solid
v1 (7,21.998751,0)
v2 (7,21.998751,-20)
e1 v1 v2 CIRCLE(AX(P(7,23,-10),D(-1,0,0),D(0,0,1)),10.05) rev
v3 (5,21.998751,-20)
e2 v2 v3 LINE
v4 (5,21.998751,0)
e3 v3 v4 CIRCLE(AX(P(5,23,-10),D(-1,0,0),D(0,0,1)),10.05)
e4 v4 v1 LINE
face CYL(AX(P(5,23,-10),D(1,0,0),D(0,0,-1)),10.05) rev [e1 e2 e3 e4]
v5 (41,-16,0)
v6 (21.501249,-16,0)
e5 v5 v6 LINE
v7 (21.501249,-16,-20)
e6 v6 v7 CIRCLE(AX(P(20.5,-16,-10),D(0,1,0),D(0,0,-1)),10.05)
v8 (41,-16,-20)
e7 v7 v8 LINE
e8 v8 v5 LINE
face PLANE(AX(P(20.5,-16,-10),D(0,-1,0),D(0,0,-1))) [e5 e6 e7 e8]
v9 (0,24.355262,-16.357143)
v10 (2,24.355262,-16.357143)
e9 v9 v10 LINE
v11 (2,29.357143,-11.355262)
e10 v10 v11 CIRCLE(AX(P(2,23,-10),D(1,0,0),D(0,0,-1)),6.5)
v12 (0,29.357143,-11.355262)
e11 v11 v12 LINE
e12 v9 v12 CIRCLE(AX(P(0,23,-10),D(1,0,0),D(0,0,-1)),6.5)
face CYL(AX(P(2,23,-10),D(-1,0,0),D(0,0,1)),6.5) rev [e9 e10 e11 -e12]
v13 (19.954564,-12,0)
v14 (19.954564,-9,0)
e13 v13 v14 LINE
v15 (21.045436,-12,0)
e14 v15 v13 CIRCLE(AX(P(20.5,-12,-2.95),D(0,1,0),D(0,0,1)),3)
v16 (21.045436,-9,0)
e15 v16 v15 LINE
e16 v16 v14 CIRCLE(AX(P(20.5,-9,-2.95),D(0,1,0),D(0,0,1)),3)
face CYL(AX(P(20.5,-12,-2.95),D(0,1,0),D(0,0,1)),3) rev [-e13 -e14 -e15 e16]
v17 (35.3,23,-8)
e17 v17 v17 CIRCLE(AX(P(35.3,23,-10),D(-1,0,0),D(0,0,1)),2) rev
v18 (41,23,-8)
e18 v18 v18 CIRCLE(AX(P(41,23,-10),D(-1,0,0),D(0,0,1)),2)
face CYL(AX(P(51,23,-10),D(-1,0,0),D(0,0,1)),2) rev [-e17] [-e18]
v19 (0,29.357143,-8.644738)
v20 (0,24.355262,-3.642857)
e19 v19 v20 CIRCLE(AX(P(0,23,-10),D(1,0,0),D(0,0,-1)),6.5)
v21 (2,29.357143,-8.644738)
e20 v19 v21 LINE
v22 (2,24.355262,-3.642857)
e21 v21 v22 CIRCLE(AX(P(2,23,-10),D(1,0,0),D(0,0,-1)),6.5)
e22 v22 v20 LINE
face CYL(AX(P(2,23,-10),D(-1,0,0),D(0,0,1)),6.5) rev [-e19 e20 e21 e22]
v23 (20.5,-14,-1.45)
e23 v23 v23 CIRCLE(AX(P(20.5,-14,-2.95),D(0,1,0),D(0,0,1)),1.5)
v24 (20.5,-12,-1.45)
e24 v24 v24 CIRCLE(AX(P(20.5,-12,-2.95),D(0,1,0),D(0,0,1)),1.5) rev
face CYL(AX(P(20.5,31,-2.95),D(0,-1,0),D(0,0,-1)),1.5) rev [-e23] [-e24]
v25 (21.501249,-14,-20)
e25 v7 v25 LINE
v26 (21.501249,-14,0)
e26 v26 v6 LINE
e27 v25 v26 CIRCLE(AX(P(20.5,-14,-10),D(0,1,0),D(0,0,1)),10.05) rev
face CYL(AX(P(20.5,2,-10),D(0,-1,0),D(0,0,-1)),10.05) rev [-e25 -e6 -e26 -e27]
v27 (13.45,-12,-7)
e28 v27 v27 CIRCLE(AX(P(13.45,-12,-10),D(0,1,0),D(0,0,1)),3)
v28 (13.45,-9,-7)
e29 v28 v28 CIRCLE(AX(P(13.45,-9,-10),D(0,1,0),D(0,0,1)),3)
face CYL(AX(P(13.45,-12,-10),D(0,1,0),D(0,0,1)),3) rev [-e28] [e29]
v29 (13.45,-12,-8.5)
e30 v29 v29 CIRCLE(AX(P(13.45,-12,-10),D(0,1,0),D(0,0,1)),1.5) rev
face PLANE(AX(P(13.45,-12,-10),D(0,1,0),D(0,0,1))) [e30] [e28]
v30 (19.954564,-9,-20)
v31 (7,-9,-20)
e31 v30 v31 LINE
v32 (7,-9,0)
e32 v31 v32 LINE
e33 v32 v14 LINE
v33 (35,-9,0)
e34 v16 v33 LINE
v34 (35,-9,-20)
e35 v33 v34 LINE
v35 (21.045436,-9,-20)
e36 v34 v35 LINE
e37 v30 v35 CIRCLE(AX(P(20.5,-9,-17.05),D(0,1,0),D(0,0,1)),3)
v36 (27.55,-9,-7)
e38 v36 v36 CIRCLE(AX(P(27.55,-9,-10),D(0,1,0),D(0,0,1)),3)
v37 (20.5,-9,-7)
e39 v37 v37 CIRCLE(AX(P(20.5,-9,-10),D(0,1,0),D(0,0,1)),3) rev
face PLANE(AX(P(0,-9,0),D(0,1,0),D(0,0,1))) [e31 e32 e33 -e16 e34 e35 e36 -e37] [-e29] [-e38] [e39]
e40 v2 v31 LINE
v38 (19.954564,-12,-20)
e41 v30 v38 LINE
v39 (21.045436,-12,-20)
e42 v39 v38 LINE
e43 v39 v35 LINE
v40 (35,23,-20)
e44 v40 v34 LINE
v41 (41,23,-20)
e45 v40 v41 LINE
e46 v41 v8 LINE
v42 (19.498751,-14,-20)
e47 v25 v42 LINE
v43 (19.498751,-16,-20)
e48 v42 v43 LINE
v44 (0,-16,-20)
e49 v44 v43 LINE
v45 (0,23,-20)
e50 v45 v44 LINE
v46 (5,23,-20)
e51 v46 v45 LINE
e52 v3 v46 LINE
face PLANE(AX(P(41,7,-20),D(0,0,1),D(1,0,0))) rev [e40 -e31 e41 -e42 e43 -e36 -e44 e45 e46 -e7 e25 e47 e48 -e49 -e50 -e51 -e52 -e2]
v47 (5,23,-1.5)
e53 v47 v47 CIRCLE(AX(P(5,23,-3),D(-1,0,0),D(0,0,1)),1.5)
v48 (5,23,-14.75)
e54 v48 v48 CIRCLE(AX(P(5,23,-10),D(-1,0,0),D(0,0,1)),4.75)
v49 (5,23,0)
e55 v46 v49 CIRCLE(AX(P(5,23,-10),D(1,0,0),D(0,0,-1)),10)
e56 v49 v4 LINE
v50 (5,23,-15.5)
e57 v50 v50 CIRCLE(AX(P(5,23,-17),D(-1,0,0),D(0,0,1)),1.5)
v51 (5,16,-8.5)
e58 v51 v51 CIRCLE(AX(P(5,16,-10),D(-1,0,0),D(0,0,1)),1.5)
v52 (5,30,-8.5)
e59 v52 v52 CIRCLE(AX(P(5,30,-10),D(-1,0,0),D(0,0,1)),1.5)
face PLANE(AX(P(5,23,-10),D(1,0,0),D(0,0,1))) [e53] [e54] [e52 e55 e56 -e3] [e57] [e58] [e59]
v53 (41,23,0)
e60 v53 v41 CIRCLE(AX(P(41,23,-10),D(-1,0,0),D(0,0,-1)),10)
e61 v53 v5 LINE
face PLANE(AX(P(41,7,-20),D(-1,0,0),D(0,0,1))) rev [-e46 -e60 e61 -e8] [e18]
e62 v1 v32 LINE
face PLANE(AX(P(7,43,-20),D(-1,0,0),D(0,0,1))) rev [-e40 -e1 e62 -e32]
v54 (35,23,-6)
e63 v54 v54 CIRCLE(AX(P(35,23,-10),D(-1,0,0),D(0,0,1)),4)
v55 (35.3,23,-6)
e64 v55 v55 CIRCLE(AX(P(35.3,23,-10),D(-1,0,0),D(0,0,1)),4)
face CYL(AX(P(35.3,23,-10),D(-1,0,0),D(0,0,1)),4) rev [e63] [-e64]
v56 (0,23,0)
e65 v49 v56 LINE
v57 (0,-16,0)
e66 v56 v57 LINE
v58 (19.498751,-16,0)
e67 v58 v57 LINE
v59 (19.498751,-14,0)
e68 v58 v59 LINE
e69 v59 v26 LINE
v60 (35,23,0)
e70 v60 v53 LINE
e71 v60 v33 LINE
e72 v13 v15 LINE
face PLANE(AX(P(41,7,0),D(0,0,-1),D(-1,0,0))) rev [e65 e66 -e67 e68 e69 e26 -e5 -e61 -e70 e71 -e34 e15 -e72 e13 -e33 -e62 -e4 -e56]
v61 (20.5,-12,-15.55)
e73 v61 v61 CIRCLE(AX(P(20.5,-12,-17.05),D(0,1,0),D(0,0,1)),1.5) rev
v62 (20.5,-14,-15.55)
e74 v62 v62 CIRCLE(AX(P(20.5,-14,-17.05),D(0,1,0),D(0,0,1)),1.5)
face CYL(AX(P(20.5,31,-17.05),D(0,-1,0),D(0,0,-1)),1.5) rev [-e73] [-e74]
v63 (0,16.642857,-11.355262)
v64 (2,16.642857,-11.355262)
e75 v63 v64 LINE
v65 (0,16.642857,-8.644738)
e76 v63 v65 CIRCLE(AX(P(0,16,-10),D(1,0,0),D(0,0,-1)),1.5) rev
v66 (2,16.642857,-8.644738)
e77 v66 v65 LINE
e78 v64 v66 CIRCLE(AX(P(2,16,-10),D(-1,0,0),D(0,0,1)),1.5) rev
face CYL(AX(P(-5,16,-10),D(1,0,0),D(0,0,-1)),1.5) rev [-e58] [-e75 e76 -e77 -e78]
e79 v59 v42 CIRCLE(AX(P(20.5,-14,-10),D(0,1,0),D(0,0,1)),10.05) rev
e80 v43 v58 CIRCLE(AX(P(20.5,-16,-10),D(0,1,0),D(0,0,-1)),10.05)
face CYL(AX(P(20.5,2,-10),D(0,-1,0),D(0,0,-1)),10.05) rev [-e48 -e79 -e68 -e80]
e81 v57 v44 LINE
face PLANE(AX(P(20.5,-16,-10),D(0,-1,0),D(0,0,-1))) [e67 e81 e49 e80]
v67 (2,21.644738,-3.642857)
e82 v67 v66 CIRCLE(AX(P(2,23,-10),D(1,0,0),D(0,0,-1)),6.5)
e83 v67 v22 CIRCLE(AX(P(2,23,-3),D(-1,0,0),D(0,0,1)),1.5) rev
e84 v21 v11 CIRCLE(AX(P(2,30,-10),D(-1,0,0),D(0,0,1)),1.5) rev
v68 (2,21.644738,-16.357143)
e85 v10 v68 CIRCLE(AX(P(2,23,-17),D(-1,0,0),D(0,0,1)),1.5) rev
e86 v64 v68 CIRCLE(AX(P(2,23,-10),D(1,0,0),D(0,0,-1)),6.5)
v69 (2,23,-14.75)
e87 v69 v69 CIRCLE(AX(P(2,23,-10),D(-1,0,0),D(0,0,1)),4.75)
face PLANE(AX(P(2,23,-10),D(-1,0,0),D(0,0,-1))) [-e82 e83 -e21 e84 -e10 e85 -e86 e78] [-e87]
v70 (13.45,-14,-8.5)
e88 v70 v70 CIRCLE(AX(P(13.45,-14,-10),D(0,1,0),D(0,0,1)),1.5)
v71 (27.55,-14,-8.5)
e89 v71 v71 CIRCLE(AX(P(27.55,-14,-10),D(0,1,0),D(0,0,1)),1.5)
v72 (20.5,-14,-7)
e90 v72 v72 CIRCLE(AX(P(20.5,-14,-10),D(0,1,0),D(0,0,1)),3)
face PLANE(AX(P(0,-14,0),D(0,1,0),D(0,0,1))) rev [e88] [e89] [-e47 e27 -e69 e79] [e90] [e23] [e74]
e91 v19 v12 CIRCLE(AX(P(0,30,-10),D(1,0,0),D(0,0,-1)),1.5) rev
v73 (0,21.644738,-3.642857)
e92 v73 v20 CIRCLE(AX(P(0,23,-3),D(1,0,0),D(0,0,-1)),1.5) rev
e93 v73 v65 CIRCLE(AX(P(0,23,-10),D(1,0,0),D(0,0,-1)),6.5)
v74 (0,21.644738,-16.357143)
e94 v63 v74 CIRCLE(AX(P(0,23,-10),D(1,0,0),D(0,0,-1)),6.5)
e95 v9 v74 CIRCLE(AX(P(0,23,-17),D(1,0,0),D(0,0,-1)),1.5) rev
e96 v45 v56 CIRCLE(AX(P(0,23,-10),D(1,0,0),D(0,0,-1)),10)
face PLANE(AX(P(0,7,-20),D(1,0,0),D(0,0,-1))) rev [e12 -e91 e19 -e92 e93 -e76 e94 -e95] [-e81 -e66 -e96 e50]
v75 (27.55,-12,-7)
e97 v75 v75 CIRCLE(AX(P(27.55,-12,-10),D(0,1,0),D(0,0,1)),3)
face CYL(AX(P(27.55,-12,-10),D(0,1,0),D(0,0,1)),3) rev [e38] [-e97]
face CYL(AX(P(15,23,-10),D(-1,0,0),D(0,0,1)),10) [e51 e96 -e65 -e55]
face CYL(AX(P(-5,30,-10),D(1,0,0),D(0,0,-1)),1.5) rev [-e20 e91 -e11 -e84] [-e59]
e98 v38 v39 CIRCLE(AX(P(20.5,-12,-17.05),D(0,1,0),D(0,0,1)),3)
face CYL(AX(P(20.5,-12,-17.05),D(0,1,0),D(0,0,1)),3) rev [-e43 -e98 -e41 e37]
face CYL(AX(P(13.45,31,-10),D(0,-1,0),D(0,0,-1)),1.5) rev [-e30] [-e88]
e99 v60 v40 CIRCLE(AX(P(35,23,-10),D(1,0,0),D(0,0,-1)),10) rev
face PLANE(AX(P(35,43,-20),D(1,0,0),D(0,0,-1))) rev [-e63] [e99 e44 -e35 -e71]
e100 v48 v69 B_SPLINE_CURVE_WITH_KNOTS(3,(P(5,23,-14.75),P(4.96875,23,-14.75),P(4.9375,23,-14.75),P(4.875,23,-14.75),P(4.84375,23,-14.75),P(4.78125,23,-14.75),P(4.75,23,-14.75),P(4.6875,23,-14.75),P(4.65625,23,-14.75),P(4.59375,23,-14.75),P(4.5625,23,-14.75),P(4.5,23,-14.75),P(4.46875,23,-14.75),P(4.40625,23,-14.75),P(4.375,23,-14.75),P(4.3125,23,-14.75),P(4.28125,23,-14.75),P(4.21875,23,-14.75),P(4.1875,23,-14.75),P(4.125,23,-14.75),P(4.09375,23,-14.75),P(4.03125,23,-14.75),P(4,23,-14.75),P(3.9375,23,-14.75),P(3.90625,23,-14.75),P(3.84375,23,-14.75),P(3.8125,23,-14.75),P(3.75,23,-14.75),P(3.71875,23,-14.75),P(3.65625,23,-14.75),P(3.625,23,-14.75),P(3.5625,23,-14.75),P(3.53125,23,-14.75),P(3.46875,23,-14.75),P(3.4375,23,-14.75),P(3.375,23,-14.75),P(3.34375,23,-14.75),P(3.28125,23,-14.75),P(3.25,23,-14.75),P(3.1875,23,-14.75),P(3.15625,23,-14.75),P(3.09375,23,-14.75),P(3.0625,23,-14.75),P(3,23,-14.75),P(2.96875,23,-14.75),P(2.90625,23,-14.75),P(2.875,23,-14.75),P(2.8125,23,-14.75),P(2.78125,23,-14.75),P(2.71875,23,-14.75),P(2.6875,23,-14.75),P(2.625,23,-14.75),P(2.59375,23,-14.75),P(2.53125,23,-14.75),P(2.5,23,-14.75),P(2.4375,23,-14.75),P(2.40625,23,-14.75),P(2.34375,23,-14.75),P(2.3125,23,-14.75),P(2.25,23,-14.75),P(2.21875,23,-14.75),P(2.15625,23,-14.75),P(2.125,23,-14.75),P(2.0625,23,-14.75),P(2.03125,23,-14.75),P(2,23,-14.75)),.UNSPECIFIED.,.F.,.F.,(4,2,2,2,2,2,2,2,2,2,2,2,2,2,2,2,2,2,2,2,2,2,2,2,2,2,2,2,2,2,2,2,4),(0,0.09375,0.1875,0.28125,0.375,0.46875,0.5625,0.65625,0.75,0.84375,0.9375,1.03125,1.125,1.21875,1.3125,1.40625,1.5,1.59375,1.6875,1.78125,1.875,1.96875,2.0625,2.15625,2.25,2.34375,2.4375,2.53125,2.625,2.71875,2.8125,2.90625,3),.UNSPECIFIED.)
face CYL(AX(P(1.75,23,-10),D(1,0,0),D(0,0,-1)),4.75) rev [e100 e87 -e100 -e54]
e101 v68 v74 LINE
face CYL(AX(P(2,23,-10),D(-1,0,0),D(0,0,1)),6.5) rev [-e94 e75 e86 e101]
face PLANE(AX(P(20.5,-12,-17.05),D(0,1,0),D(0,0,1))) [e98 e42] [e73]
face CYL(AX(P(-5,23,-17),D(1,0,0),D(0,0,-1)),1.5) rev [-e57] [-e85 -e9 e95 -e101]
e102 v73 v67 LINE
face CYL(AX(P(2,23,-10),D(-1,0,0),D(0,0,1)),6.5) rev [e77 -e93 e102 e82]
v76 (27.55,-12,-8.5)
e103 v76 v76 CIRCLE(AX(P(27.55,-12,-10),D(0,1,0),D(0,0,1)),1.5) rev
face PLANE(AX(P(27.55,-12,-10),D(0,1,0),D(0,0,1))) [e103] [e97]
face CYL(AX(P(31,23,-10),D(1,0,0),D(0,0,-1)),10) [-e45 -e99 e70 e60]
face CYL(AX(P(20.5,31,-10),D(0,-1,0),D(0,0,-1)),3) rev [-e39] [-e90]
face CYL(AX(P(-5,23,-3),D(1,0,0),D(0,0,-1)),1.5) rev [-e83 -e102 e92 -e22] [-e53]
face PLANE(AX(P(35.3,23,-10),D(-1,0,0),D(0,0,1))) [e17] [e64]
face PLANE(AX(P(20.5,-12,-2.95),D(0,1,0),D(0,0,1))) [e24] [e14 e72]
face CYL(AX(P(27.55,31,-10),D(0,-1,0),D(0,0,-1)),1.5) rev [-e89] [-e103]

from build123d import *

# Parameters (mm, degrees)
SKETCH1_W                = 41
SKETCH1_H                = 20
BOSS_EXTRUDE2_DEPTH      = 7
SKETCH3_R                = 10.05
CUT_EXTRUDE8_DEPTH       = 2
SKETCH4_R                = 1.5
SKETCH4_R_2              = 3
CUT_EXTRUDE9_DEPTH       = 29
SKETCH5_W                = 6
SKETCH5_H                = 20
SKETCH5_W_2              = 7
BOSS_EXTRUDE3_DEPTH      = 36
CUT_EXTRUDE10_DEPTH      = 36
SKETCH7_R                = 2
CUT_EXTRUDE11_DEPTH      = 51
SKETCH8_R                = 10.05
CUT_EXTRUDE12_DEPTH      = 2
SKETCH9_R                = 4.75
CUT_EXTRUDE13_DEPTH      = 3.25
SKETCH10_R               = 6.5
CUT_EXTRUDE14_DEPTH      = 2
CUT_EXTRUDE15_DEPTH      = 14
CUT_EXTRUDE15_DEPTH_BACK = 10
SKETCH12_R               = 1.5
CUT_EXTRUDE16_DEPTH      = 10
CUT_EXTRUDE17_DEPTH      = 10
MIRROR1_START            = 5
MIRROR1_DEPTH            = 2
MIRROR1_2_DEPTH          = 7
MIRROR1_3_DEPTH          = 5
CUT_EXTRUDE18_DEPTH      = 10
CUT_EXTRUDE18_DEPTH_BACK = 10
BOSS_EXTRUDE4_START      = 16
BOSS_EXTRUDE4_DEPTH      = 16
BOSS_EXTRUDE6_START      = -21
SKETCH16_W               = 28
SKETCH16_H               = 20
SKETCH16_R               = 1.5
SKETCH16_R_2             = 3
BOSS_EXTRUDE6_DEPTH      = 21
SKETCH18_W               = 28
SKETCH18_H               = 20
CUT_EXTRUDE21_DEPTH      = 16
CROQUIS2_R               = 3
CORTAR_EXTRUIR1_DEPTH    = 3
CROQUIS3_R               = 4
CORTAR_EXTRUIR2_DEPTH    = 0.3


# Read off the part's stored shape, not the designer's step: Mirror1
with BuildPart() as part:
    # Sketch1 → Boss-Extrude2 (new body)
    with BuildSketch(Plane(origin=(0, 0, 0), x_dir=(1, 0, 0), z_dir=(0, 1, 0))):
        with Locations((20.5, 10)):
            Rectangle(SKETCH1_W, SKETCH1_H)
    extrude(amount=BOSS_EXTRUDE2_DEPTH)

    # Sketch3 → Cut-Extrude8 (cut)
    with BuildSketch(Plane.XZ):
        with Locations((20.5, -10)):
            Circle(SKETCH3_R)
    extrude(amount=-CUT_EXTRUDE8_DEPTH, mode=Mode.SUBTRACT)

    # Sketch4 → Cut-Extrude9 (cut)
    with BuildSketch(Plane.XZ.offset(-2)):
        with Locations(Location((20.5, -2.95, 0), (0, 0, 270))):
            Circle(SKETCH4_R)
        with Locations(Location((27.55, -10, 0), (0, 0, 270))):
            Circle(SKETCH4_R)
        with Locations(Location((20.5, -17.05, 0), (0, 0, 270))):
            Circle(SKETCH4_R)
        with Locations(Location((13.45, -10, 0), (0, 0, 270))):
            Circle(SKETCH4_R)
        with Locations(Location((20.5, -10, 0), (0, 0, 270))):
            Circle(SKETCH4_R_2)
    extrude(amount=-CUT_EXTRUDE9_DEPTH, mode=Mode.SUBTRACT)

    # Sketch5 → Boss-Extrude3 (add)
    with BuildSketch(Plane(origin=(0, 7, 0), x_dir=(1, 0, 0), z_dir=(0, 1, 0))):
        with Locations((38, 10)):
            Rectangle(SKETCH5_W, SKETCH5_H)
        with Locations((3.5, 10)):
            Rectangle(SKETCH5_W_2, SKETCH5_H)
    extrude(amount=BOSS_EXTRUDE3_DEPTH)

    # Sketch6 → Cut-Extrude10 (cut)
    with BuildSketch(Plane.XY):
        Polygon((0, 33), (71.43253461, 33), (71.43253461, 55.308458538), (-13.966778087, 55.308458538), align=None)
    extrude(amount=-CUT_EXTRUDE10_DEPTH, mode=Mode.SUBTRACT)

    # Sketch7 → Cut-Extrude11 (cut)
    with BuildSketch(Plane.ZY):
        with Locations((-10, 23)):
            Circle(SKETCH7_R)
    extrude(amount=-CUT_EXTRUDE11_DEPTH, mode=Mode.SUBTRACT)

    # Sketch8 → Cut-Extrude12 (cut)
    with BuildSketch(Plane.ZY):
        with Locations((-10, 23)):
            Circle(SKETCH8_R)
    extrude(amount=-CUT_EXTRUDE12_DEPTH, mode=Mode.SUBTRACT)

    # Sketch9 → Cut-Extrude13 (cut)
    with BuildSketch(Plane.ZY.offset(-2)):
        with Locations((-10, 23)):
            Circle(SKETCH9_R)
    extrude(amount=-CUT_EXTRUDE13_DEPTH, mode=Mode.SUBTRACT)

    # Sketch10 → Cut-Extrude14 (cut)
    with BuildSketch(Plane(origin=(7, 0, 0), x_dir=(0, 0, -1), z_dir=(1, 0, 0))):
        with Locations((10, 23)):
            Circle(SKETCH10_R)
    extrude(amount=-CUT_EXTRUDE14_DEPTH, mode=Mode.SUBTRACT)

    # Sketch11 → Cut-Extrude15 (cut, two sides: drawn at the far end of the back side and taken through both)
    with BuildSketch(Plane.ZY.offset(-2).offset(-CUT_EXTRUDE15_DEPTH_BACK)):
        with BuildLine():
            Line((0, 23), (15.490351621, 23))
            Line((15.490351621, 23), (12.295560885, 45.157965149))
            Line((12.295560885, 45.157965149), (-24.464924867, 45.157965149))
            Line((-24.464924867, 45.157965149), (-29.902866546, 24.493786768))
            Line((-29.902866546, 24.493786768), (-20, 23))
            ThreePointArc((-20, 23), (-10, 33), (0, 23))
        make_face()
    extrude(amount=CUT_EXTRUDE15_DEPTH + CUT_EXTRUDE15_DEPTH_BACK, mode=Mode.SUBTRACT)

    # Sketch12 → Cut-Extrude16 (cut)
    with BuildSketch(Plane.ZY.offset(-2)):
        with Locations((-10, 30)):
            Circle(SKETCH12_R)
        with Locations((-3, 23)):
            Circle(SKETCH12_R)
        with Locations((-10, 16)):
            Circle(SKETCH12_R)
        with Locations((-17, 23)):
            Circle(SKETCH12_R)
    extrude(amount=-CUT_EXTRUDE16_DEPTH, mode=Mode.SUBTRACT)

    # Sketch13 → Cut-Extrude17 (cut)
    with BuildSketch(Plane(origin=(41, 0, 0), x_dir=(0, 0, -1), z_dir=(1, 0, 0))):
        with BuildLine():
            Line((20, 23), (26.17535893, 23))
            Line((26.17535893, 23), (24.098367316, 34.532076054))
            Line((24.098367316, 34.532076054), (-4.476002155, 34.532076054))
            Line((-4.476002155, 34.532076054), (-5.608906672, 23))
            Line((-5.608906672, 23), (0, 23))
            ThreePointArc((0, 23), (10, 33), (20, 23))
        make_face()
    extrude(amount=-CUT_EXTRUDE17_DEPTH, mode=Mode.SUBTRACT)

    # Mirror1 outline → Mirror1 (cut)
    with BuildSketch(Plane.YZ.offset(MIRROR1_START)):
        with BuildLine():
            Line((23, 0), (21.99875078, 0))
            ThreePointArc((21.99875078, 0), (12.95, -10), (21.99875078, -20))
            Line((21.99875078, -20), (23, -20))
            ThreePointArc((23, -20), (33, -10), (23, 0))
        make_face()
        with BuildLine():
            ThreePointArc((24.355261854, -16.357142857), (23, -18.5), (21.644738146, -16.357142857))
            ThreePointArc((21.644738146, -16.357142857), (18.403805922, -14.596194078), (16.642857143, -11.355261854))
            ThreePointArc((16.642857143, -11.355261854), (14.5, -10), (16.642857143, -8.644738146))
            ThreePointArc((16.642857143, -8.644738146), (18.403805922, -5.403805922), (21.644738146, -3.642857143))
            ThreePointArc((21.644738146, -3.642857143), (23, -1.5), (24.355261854, -3.642857143))
            ThreePointArc((24.355261854, -3.642857143), (27.596194078, -5.403805922), (29.357142857, -8.644738146))
            ThreePointArc((29.357142857, -8.644738146), (31.5, -10), (29.357142857, -11.355261854))
            ThreePointArc((29.357142857, -11.355261854), (27.596194078, -14.596194078), (24.355261854, -16.357142857))
        make_face(mode=Mode.SUBTRACT)
    extrude(amount=MIRROR1_DEPTH, mode=Mode.SUBTRACT)



with BuildPart() as body_2:
    # Mirror1 2 outline → Mirror1 2 (new body)
    with BuildSketch(Plane.YZ):
        with BuildLine():
            Line((43, 0), (24.00124922, 0))
            ThreePointArc((24.00124922, 0), (33.05, -10), (24.00124922, -20))
            Line((24.00124922, -20), (43, -20))
            Line((43, -20), (43, 0))
        make_face()
    extrude(amount=MIRROR1_2_DEPTH)


with BuildPart() as part_1:
    add(part.part)

    add(body_2.part)  # Mirror1 3 merges body 2
    # Mirror1 3 outline → Mirror1 3 (add)
    with BuildSketch(Plane.YZ):
        with BuildLine():
            ThreePointArc((21.99875078, 0), (12.95, -10), (21.99875078, -20))
            Line((21.99875078, -20), (24.00124922, -20))
            ThreePointArc((24.00124922, -20), (33.05, -10), (24.00124922, 0))
            Line((24.00124922, 0), (21.99875078, 0))
        make_face()
        with BuildLine():
            ThreePointArc((24.355261854, -16.357142857), (23, -18.5), (21.644738146, -16.357142857))
            ThreePointArc((21.644738146, -16.357142857), (18.403805922, -14.596194078), (16.642857143, -11.355261854))
            ThreePointArc((16.642857143, -11.355261854), (14.5, -10), (16.642857143, -8.644738146))
            ThreePointArc((16.642857143, -8.644738146), (18.403805922, -5.403805922), (21.644738146, -3.642857143))
            ThreePointArc((21.644738146, -3.642857143), (23, -1.5), (24.355261854, -3.642857143))
            ThreePointArc((24.355261854, -3.642857143), (27.596194078, -5.403805922), (29.357142857, -8.644738146))
            ThreePointArc((29.357142857, -8.644738146), (31.5, -10), (29.357142857, -11.355261854))
            ThreePointArc((29.357142857, -11.355261854), (27.596194078, -14.596194078), (24.355261854, -16.357142857))
        make_face(mode=Mode.SUBTRACT)
    extrude(amount=MIRROR1_3_DEPTH)

    # Sketch14 → Cut-Extrude18 (cut, two sides: drawn at the far end of the back side and taken through both)
    with BuildSketch(Plane(origin=(5, 0, 0), x_dir=(0, 0, -1), z_dir=(1, 0, 0)).offset(-CUT_EXTRUDE18_DEPTH_BACK)):
        with BuildLine():
            Line((20, 23), (39.442144398, 23))
            Line((39.442144398, 23), (24.053498228, 52.618460363))
            Line((24.053498228, 52.618460363), (-15.863160605, 48.721271778))
            Line((-15.863160605, 48.721271778), (-25.901373625, 22.149531431))
            Line((-25.901373625, 22.149531431), (0, 23))
            ThreePointArc((0, 23), (10, 33), (20, 23))
        make_face()
    extrude(amount=CUT_EXTRUDE18_DEPTH + CUT_EXTRUDE18_DEPTH_BACK, mode=Mode.SUBTRACT)

    # Sketch15 → Boss-Extrude4 (add)
    with BuildSketch(Plane.XZ.offset(BOSS_EXTRUDE4_START)):
        with BuildLine():
            Line((21.50124922, 0), (41, 0))
            Line((41, 0), (41, -20))
            Line((41, -20), (21.50124922, -20))
            ThreePointArc((21.50124922, -20), (30.55, -10), (21.50124922, 0))
        make_face()
        with BuildLine():
            Line((0, 0), (19.49875078, 0))
            ThreePointArc((19.49875078, 0), (10.45, -10), (19.49875078, -20))
            Line((19.49875078, -20), (0, -20))
            Line((0, -20), (0, 0))
        make_face()
    extrude(amount=-BOSS_EXTRUDE4_DEPTH)

    # Sketch16 → Boss-Extrude6 (add)
    with BuildSketch(Plane(origin=(0, 7, 0), x_dir=(1, 0, 0), z_dir=(0, 1, 0)).offset(BOSS_EXTRUDE6_START)):
        with Locations((21, 10)):
            Rectangle(SKETCH16_W, SKETCH16_H)
        with Locations(Location((27.55, 10, 0), (0, 0, 90))):
            Circle(SKETCH16_R, mode=Mode.SUBTRACT)
        with Locations(Location((20.5, 10, 0), (0, 0, 90))):
            Circle(SKETCH16_R_2, mode=Mode.SUBTRACT)
        with Locations(Location((13.45, 10, 0), (0, 0, 90))):
            Circle(SKETCH16_R, mode=Mode.SUBTRACT)
        with Locations(Location((20.5, 17.05, 0), (0, 0, 90))):
            Circle(SKETCH16_R, mode=Mode.SUBTRACT)
        with Locations(Location((20.5, 2.95, 0), (0, 0, 90))):
            Circle(SKETCH16_R, mode=Mode.SUBTRACT)
    extrude(amount=BOSS_EXTRUDE6_DEPTH)

    # Sketch18 → Cut-Extrude21 (cut)
    with BuildSketch(Plane(origin=(0, 7, 0), x_dir=(1, 0, 0), z_dir=(0, 1, 0))):
        with Locations((21, 10)):
            Rectangle(SKETCH18_W, SKETCH18_H)
    extrude(amount=-CUT_EXTRUDE21_DEPTH, mode=Mode.SUBTRACT)

    # Croquis2 → Cortar-Extruir1 (cut)
    with BuildSketch(Plane(origin=(0, -9, 0), x_dir=(1, 0, 0), z_dir=(0, 1, 0))):
        with Locations(Location((27.55, 10, 0), (0, 0, 270))):
            Circle(CROQUIS2_R)
        with Locations((20.5, 17.05)):
            Circle(CROQUIS2_R)
        with Locations(Location((13.45, 10, 0), (0, 0, 270))):
            Circle(CROQUIS2_R)
        with Locations((20.5, 2.95)):
            Circle(CROQUIS2_R)
    extrude(amount=-CORTAR_EXTRUIR1_DEPTH, mode=Mode.SUBTRACT)

    # Croquis3 → Cortar-Extruir2 (cut)
    with BuildSketch(Plane.ZY.offset(-35)):
        with Locations((-10, 23)):
            Circle(CROQUIS3_R)
    extrude(amount=-CORTAR_EXTRUIR2_DEPTH, mode=Mode.SUBTRACT)


solid = part_1.part
